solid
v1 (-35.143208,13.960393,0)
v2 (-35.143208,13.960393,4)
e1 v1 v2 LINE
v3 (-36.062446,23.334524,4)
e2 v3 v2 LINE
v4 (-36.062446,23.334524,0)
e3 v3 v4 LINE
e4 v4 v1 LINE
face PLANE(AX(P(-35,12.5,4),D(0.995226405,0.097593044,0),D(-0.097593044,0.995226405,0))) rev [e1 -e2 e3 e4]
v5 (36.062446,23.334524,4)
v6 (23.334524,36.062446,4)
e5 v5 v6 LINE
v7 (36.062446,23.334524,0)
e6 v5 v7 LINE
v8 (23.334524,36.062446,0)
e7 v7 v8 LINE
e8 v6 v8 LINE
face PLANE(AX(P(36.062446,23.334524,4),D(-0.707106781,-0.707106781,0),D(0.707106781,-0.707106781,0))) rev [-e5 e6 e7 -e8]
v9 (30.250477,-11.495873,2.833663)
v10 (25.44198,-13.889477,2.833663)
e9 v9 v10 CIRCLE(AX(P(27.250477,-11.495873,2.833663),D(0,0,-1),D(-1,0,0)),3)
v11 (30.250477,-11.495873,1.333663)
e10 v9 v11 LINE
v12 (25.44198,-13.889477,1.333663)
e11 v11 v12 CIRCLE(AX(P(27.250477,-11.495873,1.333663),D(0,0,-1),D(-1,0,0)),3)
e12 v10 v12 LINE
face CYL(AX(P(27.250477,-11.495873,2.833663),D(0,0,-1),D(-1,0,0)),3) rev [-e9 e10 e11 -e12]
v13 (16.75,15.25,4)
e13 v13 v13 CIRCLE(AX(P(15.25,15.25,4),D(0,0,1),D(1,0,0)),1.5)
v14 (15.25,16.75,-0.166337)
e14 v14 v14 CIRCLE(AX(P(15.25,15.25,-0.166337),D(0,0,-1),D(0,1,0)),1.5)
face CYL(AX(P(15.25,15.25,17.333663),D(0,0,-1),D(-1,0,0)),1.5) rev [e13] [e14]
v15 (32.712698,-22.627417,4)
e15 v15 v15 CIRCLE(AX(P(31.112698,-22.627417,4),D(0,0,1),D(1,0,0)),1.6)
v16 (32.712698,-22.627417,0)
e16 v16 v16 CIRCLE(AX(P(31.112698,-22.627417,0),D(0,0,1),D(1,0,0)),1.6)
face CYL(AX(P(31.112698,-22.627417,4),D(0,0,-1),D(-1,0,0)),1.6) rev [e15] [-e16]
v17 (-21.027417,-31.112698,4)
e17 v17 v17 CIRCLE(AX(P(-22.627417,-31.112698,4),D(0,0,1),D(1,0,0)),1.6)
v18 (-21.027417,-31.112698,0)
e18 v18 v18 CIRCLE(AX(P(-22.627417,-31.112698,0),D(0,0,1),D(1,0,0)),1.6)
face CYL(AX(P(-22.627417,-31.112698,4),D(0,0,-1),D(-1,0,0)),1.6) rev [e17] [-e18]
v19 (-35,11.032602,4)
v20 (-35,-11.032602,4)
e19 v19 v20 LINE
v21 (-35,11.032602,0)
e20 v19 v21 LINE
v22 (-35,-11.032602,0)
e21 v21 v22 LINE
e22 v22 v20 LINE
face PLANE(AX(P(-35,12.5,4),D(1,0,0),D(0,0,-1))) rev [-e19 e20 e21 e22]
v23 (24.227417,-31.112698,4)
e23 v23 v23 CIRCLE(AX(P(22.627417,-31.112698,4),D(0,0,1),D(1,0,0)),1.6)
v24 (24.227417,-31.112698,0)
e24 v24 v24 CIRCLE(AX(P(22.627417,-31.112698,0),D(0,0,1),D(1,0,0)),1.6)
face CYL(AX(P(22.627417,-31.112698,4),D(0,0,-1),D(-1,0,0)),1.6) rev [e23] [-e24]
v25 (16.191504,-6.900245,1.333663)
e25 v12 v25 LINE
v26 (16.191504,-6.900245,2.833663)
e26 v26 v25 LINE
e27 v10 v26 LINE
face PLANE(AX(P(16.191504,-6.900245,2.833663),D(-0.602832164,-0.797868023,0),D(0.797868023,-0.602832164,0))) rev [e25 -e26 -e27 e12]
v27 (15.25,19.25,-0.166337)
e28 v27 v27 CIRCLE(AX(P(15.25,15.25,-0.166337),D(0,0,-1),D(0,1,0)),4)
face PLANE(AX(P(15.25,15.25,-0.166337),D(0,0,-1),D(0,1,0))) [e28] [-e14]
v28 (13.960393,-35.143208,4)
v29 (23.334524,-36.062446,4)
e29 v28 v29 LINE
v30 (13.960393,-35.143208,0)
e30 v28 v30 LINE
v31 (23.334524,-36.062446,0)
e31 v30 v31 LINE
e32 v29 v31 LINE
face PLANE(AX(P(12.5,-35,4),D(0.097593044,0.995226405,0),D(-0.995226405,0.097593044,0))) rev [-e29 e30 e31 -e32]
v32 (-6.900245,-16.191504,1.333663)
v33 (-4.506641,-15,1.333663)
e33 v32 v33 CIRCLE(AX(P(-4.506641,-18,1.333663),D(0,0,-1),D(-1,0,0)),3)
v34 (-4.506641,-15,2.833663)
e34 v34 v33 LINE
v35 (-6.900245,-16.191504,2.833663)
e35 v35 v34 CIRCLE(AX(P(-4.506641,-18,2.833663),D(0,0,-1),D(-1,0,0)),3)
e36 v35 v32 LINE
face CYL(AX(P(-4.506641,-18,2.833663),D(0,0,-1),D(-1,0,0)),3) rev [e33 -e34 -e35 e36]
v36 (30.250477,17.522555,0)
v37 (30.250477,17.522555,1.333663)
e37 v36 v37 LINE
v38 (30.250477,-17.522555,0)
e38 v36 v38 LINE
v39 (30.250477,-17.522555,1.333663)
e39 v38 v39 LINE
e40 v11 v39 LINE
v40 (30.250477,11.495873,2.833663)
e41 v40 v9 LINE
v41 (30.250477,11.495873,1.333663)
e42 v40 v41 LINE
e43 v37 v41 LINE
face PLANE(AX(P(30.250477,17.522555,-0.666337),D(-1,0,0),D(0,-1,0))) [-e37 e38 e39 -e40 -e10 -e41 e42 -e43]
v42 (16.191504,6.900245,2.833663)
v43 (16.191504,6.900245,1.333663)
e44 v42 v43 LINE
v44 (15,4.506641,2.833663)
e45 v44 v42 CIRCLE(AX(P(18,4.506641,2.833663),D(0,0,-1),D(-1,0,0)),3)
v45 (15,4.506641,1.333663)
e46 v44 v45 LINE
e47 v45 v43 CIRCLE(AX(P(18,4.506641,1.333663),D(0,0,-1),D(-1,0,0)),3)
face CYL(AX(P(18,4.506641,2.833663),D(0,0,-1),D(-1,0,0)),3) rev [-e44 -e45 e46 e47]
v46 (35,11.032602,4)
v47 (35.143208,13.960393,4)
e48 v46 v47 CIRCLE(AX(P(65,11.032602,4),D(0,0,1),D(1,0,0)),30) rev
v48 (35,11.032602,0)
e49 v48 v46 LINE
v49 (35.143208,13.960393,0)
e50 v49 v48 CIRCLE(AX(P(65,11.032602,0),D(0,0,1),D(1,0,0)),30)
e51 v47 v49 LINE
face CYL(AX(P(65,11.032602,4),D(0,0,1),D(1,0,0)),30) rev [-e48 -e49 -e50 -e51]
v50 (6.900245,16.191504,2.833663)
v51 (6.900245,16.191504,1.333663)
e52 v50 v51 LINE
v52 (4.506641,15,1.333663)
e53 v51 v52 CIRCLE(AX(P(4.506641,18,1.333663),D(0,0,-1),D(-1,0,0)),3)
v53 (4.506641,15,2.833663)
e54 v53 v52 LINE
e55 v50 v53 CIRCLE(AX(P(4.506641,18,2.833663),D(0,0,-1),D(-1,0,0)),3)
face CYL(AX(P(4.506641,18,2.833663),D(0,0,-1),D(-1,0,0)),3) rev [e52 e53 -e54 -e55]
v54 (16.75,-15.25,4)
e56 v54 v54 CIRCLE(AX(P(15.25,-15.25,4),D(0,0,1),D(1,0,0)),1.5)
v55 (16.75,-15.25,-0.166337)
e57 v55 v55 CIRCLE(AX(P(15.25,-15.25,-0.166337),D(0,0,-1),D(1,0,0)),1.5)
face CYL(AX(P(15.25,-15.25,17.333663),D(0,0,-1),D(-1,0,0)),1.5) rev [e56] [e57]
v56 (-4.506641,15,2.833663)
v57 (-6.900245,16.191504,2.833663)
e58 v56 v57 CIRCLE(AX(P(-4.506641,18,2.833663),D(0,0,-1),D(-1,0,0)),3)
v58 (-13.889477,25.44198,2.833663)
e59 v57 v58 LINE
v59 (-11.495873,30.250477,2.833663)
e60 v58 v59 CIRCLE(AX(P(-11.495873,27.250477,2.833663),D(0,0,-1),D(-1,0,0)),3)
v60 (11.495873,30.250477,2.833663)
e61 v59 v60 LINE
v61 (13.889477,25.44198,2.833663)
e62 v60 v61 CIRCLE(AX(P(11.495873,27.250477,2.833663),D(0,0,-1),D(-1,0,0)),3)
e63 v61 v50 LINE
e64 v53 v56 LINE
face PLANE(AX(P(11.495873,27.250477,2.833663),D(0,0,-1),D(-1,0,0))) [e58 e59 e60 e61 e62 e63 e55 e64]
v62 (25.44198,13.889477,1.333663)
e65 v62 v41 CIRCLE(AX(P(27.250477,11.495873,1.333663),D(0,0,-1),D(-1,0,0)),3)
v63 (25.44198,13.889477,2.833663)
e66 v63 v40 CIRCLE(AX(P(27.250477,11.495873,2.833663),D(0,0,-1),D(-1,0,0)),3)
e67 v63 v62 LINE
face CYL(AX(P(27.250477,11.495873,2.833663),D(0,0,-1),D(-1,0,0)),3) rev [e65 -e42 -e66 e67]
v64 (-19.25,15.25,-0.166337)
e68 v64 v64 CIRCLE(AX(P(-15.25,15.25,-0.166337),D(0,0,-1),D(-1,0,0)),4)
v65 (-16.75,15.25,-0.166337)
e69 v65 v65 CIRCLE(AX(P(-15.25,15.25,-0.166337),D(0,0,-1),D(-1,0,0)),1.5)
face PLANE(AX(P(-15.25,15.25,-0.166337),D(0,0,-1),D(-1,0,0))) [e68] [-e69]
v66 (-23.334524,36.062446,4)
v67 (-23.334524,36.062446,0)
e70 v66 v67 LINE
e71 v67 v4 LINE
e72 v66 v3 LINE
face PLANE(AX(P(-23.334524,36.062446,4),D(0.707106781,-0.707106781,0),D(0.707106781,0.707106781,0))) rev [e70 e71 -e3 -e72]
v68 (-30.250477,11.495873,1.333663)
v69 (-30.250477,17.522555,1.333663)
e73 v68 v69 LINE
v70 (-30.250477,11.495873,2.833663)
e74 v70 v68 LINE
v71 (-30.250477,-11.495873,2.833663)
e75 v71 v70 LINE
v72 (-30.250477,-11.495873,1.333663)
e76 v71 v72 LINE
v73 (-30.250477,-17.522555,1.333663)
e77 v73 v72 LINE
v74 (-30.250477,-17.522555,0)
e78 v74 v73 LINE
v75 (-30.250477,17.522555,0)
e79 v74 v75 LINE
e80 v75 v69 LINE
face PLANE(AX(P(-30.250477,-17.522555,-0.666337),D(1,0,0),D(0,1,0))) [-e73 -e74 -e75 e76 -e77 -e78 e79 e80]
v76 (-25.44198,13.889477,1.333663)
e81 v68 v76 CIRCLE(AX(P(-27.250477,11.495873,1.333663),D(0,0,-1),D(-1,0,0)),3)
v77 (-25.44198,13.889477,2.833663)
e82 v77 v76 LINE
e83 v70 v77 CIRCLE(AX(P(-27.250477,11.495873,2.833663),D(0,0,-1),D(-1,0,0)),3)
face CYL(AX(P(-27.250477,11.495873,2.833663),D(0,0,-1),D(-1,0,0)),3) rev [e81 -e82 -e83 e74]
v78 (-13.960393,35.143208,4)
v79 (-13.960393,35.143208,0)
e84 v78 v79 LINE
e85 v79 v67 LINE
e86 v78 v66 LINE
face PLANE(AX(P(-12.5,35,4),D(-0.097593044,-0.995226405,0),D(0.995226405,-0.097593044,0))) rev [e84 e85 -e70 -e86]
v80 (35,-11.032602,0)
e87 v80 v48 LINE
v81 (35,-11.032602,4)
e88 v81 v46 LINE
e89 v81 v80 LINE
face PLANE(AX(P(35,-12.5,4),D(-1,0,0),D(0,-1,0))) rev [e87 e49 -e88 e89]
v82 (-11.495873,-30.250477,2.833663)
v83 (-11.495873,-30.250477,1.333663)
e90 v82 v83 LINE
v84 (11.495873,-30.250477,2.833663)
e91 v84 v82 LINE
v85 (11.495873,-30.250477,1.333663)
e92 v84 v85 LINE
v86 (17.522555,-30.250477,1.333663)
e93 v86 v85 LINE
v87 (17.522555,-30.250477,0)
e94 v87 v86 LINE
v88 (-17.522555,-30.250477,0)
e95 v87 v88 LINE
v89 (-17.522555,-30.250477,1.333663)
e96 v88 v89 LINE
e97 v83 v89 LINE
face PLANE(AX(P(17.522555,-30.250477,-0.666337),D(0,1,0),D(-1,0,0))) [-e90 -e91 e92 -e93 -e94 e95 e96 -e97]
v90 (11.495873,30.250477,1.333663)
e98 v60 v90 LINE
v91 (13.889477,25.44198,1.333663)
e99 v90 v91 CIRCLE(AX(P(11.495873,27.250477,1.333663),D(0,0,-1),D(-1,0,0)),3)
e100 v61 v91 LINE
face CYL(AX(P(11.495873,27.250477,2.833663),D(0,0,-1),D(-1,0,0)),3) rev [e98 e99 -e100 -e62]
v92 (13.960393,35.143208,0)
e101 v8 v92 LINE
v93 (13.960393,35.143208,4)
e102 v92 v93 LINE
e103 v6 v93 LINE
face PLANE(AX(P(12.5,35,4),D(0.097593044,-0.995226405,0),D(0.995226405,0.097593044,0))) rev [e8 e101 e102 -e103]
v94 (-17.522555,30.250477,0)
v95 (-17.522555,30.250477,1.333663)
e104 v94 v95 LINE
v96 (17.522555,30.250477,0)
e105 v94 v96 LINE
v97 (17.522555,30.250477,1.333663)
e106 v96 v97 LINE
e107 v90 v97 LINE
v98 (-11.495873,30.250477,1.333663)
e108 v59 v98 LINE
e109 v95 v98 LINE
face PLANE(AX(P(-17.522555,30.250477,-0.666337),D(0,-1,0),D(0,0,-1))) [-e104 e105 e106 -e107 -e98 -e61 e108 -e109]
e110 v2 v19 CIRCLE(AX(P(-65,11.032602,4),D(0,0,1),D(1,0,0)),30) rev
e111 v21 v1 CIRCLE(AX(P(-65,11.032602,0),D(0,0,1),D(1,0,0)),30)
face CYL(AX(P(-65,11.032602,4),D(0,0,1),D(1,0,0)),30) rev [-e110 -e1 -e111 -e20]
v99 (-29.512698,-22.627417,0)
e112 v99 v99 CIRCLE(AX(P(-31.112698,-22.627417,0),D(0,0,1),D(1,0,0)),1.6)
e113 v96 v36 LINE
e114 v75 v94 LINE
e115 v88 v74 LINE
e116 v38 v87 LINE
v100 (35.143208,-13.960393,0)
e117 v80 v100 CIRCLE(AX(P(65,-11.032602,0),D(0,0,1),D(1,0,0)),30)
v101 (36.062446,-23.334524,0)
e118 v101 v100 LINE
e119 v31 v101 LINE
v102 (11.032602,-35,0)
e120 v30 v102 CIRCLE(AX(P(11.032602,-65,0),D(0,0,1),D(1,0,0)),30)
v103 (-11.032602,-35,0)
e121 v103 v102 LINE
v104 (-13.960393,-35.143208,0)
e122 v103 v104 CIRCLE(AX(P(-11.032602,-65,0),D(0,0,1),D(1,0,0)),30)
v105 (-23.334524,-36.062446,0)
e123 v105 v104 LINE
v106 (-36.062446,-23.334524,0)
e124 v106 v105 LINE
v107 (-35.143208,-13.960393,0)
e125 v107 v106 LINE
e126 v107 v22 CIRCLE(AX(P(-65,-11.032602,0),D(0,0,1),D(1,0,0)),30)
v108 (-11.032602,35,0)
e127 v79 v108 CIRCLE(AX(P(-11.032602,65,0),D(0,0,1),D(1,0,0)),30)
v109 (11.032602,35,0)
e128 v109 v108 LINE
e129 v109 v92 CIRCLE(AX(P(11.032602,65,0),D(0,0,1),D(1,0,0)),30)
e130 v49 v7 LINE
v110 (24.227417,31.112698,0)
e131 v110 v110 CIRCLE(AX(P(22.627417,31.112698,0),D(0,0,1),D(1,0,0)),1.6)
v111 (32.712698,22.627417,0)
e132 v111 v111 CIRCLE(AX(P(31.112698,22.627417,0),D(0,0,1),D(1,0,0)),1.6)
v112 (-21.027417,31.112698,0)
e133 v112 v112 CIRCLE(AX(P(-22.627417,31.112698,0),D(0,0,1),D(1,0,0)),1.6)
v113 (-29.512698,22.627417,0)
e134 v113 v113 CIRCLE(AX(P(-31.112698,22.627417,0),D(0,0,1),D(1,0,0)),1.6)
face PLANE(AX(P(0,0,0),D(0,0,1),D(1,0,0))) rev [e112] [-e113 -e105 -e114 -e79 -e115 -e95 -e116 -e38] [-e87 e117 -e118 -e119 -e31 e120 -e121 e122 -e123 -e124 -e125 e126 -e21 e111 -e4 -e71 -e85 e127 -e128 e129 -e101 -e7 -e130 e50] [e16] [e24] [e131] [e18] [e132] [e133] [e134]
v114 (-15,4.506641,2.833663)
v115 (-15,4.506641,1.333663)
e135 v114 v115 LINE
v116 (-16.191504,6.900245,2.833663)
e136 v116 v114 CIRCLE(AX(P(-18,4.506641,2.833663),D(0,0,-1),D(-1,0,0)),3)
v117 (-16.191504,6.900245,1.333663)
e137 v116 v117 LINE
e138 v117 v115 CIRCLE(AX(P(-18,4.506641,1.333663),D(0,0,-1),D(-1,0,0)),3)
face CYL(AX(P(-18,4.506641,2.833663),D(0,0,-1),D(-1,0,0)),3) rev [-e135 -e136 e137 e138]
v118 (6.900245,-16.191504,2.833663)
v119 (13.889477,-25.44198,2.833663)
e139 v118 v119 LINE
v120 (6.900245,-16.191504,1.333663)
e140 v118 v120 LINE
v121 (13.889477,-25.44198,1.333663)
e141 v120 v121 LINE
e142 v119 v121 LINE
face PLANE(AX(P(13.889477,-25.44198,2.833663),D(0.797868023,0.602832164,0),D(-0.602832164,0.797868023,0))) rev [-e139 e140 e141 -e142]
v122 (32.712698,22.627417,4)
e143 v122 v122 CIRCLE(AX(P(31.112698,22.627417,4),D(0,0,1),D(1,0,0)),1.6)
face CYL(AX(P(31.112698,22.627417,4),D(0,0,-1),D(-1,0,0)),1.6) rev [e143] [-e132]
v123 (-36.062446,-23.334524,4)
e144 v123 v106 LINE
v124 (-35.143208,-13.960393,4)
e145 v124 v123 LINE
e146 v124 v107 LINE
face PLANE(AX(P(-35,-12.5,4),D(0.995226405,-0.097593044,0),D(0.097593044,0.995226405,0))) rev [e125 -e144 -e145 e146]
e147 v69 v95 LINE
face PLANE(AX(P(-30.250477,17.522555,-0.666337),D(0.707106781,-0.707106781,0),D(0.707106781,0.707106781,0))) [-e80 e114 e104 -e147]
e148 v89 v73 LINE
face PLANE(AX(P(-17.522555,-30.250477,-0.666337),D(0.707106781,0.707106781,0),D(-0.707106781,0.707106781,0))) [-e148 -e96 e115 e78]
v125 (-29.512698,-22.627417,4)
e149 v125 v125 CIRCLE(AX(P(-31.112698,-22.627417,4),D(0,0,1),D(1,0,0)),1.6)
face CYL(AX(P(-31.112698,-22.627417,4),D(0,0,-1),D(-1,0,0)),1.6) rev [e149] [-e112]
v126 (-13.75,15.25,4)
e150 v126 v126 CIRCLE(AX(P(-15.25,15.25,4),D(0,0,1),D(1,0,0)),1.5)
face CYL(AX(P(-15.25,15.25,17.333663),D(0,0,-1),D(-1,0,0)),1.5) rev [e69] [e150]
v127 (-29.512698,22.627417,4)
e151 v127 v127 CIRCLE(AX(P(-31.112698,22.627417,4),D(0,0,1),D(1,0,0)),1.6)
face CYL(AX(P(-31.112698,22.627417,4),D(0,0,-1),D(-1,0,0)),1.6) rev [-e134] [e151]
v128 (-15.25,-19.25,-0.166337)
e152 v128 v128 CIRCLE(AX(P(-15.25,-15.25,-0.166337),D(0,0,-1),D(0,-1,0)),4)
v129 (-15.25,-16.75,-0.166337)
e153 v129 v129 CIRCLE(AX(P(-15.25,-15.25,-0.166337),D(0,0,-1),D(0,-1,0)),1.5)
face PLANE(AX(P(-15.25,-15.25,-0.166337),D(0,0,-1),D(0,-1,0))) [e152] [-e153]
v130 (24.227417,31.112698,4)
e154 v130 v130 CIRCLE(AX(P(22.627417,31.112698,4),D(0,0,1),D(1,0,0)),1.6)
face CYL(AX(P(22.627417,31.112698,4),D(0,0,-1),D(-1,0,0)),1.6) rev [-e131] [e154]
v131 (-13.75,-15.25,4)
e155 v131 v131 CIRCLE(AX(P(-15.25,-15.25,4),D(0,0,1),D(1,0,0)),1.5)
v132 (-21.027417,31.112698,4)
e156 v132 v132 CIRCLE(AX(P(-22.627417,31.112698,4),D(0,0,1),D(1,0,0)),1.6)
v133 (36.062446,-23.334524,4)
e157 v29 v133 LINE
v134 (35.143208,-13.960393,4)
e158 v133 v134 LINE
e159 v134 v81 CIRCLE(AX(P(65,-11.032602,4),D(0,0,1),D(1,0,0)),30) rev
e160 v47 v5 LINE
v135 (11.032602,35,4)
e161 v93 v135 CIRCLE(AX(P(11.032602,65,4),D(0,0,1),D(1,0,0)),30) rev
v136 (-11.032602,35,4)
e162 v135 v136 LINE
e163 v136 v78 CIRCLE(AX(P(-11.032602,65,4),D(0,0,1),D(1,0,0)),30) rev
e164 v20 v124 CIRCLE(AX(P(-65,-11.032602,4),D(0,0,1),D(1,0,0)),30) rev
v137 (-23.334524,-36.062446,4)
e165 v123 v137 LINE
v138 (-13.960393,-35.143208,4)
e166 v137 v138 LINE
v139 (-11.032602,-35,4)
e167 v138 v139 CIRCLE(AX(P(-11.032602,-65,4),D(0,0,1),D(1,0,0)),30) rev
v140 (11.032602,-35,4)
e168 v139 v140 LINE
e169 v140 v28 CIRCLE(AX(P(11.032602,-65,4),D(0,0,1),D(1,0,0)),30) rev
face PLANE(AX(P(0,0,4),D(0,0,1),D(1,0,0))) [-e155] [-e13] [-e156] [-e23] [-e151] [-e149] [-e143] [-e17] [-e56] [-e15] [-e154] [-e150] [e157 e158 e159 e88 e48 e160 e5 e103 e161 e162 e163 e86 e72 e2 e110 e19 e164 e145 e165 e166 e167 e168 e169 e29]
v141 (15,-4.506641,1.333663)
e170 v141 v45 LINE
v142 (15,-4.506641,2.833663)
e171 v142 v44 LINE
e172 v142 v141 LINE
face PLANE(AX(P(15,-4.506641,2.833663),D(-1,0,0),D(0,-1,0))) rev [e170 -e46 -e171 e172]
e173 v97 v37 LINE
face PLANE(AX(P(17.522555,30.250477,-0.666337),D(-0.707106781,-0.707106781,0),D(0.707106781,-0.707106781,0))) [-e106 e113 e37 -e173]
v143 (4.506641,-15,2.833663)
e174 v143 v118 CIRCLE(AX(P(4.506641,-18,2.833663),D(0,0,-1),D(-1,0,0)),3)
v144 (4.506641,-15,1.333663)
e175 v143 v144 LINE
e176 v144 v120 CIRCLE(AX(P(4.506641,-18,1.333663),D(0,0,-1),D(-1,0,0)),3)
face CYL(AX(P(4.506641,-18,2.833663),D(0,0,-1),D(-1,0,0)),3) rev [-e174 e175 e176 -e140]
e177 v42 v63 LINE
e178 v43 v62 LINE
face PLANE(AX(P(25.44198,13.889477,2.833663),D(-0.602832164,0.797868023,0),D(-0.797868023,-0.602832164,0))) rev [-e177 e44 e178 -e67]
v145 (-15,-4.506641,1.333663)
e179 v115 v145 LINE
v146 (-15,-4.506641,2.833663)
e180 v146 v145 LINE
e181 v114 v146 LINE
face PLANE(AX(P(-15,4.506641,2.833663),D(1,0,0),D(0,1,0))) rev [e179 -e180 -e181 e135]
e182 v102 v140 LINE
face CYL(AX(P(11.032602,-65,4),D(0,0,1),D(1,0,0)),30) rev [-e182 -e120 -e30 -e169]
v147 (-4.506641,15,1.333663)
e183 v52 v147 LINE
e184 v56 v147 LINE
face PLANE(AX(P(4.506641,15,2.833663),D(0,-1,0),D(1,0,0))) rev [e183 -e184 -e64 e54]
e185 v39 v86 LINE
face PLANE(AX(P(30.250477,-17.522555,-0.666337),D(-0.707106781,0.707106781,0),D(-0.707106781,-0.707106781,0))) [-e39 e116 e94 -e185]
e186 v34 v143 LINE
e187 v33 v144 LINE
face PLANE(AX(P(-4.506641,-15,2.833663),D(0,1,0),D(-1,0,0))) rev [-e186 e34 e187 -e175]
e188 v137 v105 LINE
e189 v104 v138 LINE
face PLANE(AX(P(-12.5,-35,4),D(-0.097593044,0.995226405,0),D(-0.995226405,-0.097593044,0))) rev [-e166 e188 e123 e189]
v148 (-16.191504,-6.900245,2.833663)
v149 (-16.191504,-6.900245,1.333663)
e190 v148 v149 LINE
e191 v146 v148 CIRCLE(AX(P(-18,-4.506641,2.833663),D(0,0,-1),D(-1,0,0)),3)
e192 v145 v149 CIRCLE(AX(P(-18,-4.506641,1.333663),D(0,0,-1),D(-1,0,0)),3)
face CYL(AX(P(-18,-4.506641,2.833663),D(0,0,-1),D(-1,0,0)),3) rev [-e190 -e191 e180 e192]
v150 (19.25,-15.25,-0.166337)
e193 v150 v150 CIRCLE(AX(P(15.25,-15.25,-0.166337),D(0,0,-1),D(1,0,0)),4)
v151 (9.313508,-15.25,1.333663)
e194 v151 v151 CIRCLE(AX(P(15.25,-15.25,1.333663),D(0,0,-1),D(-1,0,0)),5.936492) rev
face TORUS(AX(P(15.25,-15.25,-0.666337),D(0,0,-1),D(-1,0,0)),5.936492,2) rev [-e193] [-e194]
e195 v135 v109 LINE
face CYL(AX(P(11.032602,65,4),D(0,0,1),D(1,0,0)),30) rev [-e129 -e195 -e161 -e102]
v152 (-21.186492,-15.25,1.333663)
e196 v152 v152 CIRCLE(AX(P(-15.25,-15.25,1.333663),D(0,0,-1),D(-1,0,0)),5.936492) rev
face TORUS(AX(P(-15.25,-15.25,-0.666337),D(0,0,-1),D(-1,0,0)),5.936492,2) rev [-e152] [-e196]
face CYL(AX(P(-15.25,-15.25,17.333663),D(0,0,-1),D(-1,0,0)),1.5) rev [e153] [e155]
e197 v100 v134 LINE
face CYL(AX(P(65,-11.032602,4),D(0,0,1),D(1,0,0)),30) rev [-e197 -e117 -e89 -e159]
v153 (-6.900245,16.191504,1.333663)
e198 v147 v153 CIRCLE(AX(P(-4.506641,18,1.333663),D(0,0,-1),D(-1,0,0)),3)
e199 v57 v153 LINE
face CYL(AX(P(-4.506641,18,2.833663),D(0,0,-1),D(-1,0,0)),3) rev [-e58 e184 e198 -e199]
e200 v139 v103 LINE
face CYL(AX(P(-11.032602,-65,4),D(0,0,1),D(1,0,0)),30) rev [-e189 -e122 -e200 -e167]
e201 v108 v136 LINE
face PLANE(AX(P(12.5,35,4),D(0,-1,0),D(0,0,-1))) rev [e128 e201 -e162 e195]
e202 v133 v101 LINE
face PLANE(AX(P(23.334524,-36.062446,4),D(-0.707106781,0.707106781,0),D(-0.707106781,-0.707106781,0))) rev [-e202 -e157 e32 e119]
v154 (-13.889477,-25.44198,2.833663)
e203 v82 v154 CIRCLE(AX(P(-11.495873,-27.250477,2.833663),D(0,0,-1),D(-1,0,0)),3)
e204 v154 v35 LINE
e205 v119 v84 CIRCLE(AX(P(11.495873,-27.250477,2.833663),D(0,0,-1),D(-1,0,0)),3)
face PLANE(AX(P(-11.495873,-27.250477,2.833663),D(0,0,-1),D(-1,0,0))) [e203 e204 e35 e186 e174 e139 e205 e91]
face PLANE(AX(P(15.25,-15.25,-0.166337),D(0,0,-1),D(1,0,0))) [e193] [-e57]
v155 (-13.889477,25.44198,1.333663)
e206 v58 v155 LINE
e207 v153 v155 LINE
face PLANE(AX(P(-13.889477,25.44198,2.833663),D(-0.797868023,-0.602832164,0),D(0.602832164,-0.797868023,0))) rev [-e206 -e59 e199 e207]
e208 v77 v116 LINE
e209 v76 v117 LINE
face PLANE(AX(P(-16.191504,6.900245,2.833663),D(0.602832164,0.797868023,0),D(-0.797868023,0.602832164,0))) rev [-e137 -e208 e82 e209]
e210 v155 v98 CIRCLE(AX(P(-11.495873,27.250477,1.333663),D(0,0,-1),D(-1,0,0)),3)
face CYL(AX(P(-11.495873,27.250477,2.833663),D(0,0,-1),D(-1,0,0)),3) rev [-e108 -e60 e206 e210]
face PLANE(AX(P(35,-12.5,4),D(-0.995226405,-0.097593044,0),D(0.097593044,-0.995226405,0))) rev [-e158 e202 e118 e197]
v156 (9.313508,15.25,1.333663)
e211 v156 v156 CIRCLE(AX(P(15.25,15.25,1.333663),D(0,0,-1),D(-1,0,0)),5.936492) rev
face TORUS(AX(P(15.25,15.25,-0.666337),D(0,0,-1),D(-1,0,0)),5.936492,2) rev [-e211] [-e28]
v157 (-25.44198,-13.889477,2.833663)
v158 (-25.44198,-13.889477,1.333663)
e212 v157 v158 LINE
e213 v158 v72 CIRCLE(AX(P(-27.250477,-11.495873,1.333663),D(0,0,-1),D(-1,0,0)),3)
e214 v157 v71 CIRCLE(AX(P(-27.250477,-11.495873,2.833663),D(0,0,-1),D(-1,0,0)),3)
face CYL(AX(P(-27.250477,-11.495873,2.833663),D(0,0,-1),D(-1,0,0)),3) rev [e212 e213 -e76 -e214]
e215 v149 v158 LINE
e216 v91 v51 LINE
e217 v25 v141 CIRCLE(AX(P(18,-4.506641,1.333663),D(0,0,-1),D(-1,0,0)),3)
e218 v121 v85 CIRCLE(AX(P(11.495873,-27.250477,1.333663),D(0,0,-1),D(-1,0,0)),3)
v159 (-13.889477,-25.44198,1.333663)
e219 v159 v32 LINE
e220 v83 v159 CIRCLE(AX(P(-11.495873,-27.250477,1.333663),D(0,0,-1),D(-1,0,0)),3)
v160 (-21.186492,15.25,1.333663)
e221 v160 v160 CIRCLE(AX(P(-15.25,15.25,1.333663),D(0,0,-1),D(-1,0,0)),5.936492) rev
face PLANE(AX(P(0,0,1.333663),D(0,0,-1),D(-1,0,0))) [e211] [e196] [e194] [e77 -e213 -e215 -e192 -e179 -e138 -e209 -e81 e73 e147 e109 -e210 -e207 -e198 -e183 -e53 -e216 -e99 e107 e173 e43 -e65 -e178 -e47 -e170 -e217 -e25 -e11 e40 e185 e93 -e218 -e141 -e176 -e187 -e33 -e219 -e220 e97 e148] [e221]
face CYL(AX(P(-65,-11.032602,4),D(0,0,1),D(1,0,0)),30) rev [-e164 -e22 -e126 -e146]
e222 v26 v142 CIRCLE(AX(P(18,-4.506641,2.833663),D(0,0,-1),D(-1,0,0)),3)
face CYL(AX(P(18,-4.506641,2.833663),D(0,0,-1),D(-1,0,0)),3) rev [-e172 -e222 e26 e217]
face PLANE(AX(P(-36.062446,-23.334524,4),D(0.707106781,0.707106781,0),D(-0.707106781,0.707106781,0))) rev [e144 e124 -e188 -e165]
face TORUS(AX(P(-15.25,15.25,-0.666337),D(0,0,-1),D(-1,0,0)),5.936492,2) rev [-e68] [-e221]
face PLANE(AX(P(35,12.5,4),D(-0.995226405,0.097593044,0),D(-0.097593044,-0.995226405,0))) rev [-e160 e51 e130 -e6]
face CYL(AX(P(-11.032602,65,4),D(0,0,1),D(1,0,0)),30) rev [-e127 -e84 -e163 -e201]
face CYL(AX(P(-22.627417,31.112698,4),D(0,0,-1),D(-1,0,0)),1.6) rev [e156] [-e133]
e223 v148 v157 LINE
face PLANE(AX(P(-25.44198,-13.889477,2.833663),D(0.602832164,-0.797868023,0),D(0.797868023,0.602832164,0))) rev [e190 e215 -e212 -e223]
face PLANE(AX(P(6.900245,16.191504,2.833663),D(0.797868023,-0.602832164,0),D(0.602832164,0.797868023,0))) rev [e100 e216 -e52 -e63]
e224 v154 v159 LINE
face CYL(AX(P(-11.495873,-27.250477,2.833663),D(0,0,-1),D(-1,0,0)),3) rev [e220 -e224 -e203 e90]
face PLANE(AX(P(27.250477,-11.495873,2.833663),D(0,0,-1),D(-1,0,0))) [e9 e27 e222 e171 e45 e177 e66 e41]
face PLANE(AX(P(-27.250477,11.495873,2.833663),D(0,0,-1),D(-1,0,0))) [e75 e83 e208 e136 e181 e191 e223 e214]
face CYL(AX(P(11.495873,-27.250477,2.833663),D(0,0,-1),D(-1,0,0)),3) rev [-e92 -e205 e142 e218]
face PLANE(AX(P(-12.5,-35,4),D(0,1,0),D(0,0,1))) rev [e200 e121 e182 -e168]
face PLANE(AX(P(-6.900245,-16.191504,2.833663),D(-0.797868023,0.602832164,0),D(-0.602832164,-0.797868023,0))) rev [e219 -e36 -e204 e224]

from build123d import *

# Parameters (mm, degrees)
SKETCH1_R           = 1.6
BOSS_EXTRUDE1_DEPTH = 4
CUT_EXTRUDE7_DEPTH  = 1
CUT_EXTRUDE8_DEPTH  = 1.5
SKETCH8_R           = 4
BOSS_EXTRUDE5_DEPTH = 1.5
SKETCH13_R          = 1.5
CUT_EXTRUDE12_DEPTH = 17.5
CIRPATTERN2_COUNT   = 4
FILLET2_R           = 2
FILLET3_R           = 30


with BuildPart() as part:
    # Sketch1 → Boss-Extrude1 (new body)
    with BuildSketch(Plane.XY):
        Polygon((12.5, 35), (-12.5, 35), (-23.334523779, 36.062445841), (-36.062445841, 23.334523779), (-35, 12.5), (-35, -12.5), (-36.062445841, -23.334523779), (-23.334523779, -36.062445841), (-12.5, -35), (12.5, -35), (23.334523779, -36.062445841), (36.062445841, -23.334523779), (35, -12.5), (35, 12.5), (36.062445841, 23.334523779), (23.334523779, 36.062445841), align=None)
        with Locations((31.112698372, 22.627416998)):
            Circle(SKETCH1_R, mode=Mode.SUBTRACT)
        with Locations((22.627416998, 31.112698372)):
            Circle(SKETCH1_R, mode=Mode.SUBTRACT)
        with Locations((22.627416998, -31.112698372)):
            Circle(SKETCH1_R, mode=Mode.SUBTRACT)
        with Locations((31.112698372, -22.627416998)):
            Circle(SKETCH1_R, mode=Mode.SUBTRACT)
        with Locations((-31.112698372, -22.627416998)):
            Circle(SKETCH1_R, mode=Mode.SUBTRACT)
        with Locations((-22.627416998, -31.112698372)):
            Circle(SKETCH1_R, mode=Mode.SUBTRACT)
        with Locations((-22.627416998, 31.112698372)):
            Circle(SKETCH1_R, mode=Mode.SUBTRACT)
        with Locations((-31.112698372, 22.627416998)):
            Circle(SKETCH1_R, mode=Mode.SUBTRACT)
    extrude(amount=BOSS_EXTRUDE1_DEPTH)

    # 3DSketch1 → Cut-Extrude7 (cut, symmetric)
    with BuildSketch(Plane(origin=(-17.522554566, 30.250476628, 0.3336629), x_dir=(0.5012316605773316, -0.8653131354803826, 0), z_dir=(0, 0, -1))):
        Polygon((0, 0), (17.565718245, -30.324993267), (34.958993903, -34.958993903), (65.28398717, -17.393275658), (69.917987806, 0), (52.352269561, 30.324993267), (34.958993903, 34.958993903), (4.634000637, 17.393275658), align=None)
    extrude(amount=CUT_EXTRUDE7_DEPTH, both=True, mode=Mode.SUBTRACT)

    # Sketch7 → Cut-Extrude8 (cut)
    with BuildSketch(Plane(origin=(0, 0, 1.3336629), x_dir=(-1, 0, 0), z_dir=(0, 0, -1))):
        with BuildLine():
            Line((-15, -4.506640856), (-15, 4.506640856))
            ThreePointArc((-15, 4.506640856), (-15.314344635, 5.843523522), (-16.191503508, 6.900244925))
            Line((-16.191503508, 6.900244925), (-25.441980135, 13.889477085))
            ThreePointArc((-25.441980135, 13.889477085), (-28.587359293, 14.181528381), (-30.250476628, 11.495873016))
            Line((-30.250476628, 11.495873016), (-30.250476628, -11.495873016))
            ThreePointArc((-30.250476628, -11.495873016), (-28.587359293, -14.181528381), (-25.441980135, -13.889477085))
            Line((-25.441980135, -13.889477085), (-16.191503508, -6.900244925))
            ThreePointArc((-16.191503508, -6.900244925), (-15.314344635, -5.843523522), (-15, -4.506640856))
        make_face()
        with BuildLine():
            Line((13.889477085, 25.441980135), (6.900244925, 16.191503508))
            ThreePointArc((6.900244925, 16.191503508), (5.843523522, 15.314344635), (4.506640856, 15))
            Line((4.506640856, 15), (-4.506640856, 15))
            ThreePointArc((-4.506640856, 15), (-5.843523522, 15.314344635), (-6.900244925, 16.191503508))
            Line((-6.900244925, 16.191503508), (-13.889477085, 25.441980135))
            ThreePointArc((-13.889477085, 25.441980135), (-14.181528381, 28.587359293), (-11.495873016, 30.250476628))
            Line((-11.495873016, 30.250476628), (11.495873016, 30.250476628))
            ThreePointArc((11.495873016, 30.250476628), (14.181528381, 28.587359293), (13.889477085, 25.441980135))
        make_face()
        with BuildLine():
            Line((25.441980135, -13.889477085), (16.191503508, -6.900244925))
            ThreePointArc((16.191503508, -6.900244925), (15.314344635, -5.843523522), (15, -4.506640856))
            Line((15, -4.506640856), (15, 4.506640856))
            ThreePointArc((15, 4.506640856), (15.314344635, 5.843523522), (16.191503508, 6.900244925))
            Line((16.191503508, 6.900244925), (25.441980135, 13.889477085))
            ThreePointArc((25.441980135, 13.889477085), (28.587359293, 14.181528381), (30.250476628, 11.495873016))
            Line((30.250476628, 11.495873016), (30.250476628, -11.495873016))
            ThreePointArc((30.250476628, -11.495873016), (28.587359293, -14.181528381), (25.441980135, -13.889477085))
        make_face()
        with BuildLine():
            Line((-13.889477085, -25.441980135), (-6.900244925, -16.191503508))
            ThreePointArc((-6.900244925, -16.191503508), (-5.843523522, -15.314344635), (-4.506640856, -15))
            Line((-4.506640856, -15), (4.506640856, -15))
            ThreePointArc((4.506640856, -15), (5.843523522, -15.314344635), (6.900244925, -16.191503508))
            Line((6.900244925, -16.191503508), (13.889477085, -25.441980135))
            ThreePointArc((13.889477085, -25.441980135), (14.181528381, -28.587359293), (11.495873016, -30.250476628))
            Line((11.495873016, -30.250476628), (-11.495873016, -30.250476628))
            ThreePointArc((-11.495873016, -30.250476628), (-14.181528381, -28.587359293), (-13.889477085, -25.441980135))
        make_face()
    extrude(amount=-CUT_EXTRUDE8_DEPTH, mode=Mode.SUBTRACT)

    # Sketch8 → Boss-Extrude5 (add)
    with BuildSketch(Plane(origin=(0, 0, 1.3336629), x_dir=(-1, 0, 0), z_dir=(0, 0, -1))):
        with Locations((15.25, 15.25)):
            Circle(SKETCH8_R)
    boss_extrude5 = extrude(amount=BOSS_EXTRUDE5_DEPTH)

    # Sketch13 → Cut-Extrude12 (cut)
    with BuildSketch(Plane(origin=(0, 0, -0.1663371), x_dir=(-1, 0, 0), z_dir=(0, 0, -1))):
        with Locations((15.25, 15.25)):
            Circle(SKETCH13_R)
    cut_extrude12 = extrude(amount=-CUT_EXTRUDE12_DEPTH, mode=Mode.SUBTRACT)

    # CirPattern2: Boss-Extrude5, Cut-Extrude12 ×4 about axis
    cirpattern2_axis = Axis((0, 0, 0), (0, 0, 1))
    add([boss_extrude5.rotate(cirpattern2_axis, i * 360 / CIRPATTERN2_COUNT) for i in range(1, CIRPATTERN2_COUNT)])
    add([cut_extrude12.rotate(cirpattern2_axis, i * 360 / CIRPATTERN2_COUNT) for i in range(1, CIRPATTERN2_COUNT)], mode=Mode.SUBTRACT)

    # Fillet2
    # the kernel refuses this fillet: 2 mm, written as the material it adds along each edge
    with BuildSketch(Plane(origin=(-15.25, 15.25, 1.3336629), x_dir=(-1, 0, 0), z_dir=(0, -1, 0))) as fillet2_piece_1:
        with BuildLine():
            CenterArc((5.936491673, 2), FILLET2_R, 194.477512186, 75.522487814)
            Line((4, 1.5), (3.961270167, 1.49))
            ThreePointArc((3.961270167, 1.49), (3.96, 0.75), (3.96, 0))
            Line((3.96, 0), (4, -0.04))
            Line((4, -0.04), (5.936491673, -0.04))
            Line((5.936491673, -0.04), (5.936491673, 0))
        make_face()
    revolve(axis=Axis((-15.25, 15.25, 1.3336629), (0, 0, -1)))
    with BuildSketch(Plane(origin=(-15.25, -15.25, 1.3336629), x_dir=(0, -1, 0), z_dir=(1, 0, 0))) as fillet2_piece_2:
        with BuildLine():
            CenterArc((5.936491673, 2), FILLET2_R, 194.477512186, 75.522487814)
            Line((4, 1.5), (3.961270167, 1.49))
            ThreePointArc((3.961270167, 1.49), (3.96, 0.75), (3.96, 0))
            Line((3.96, 0), (4, -0.04))
            Line((4, -0.04), (5.936491673, -0.04))
            Line((5.936491673, -0.04), (5.936491673, 0))
        make_face()
    revolve(axis=Axis((-15.25, -15.25, 1.3336629), (0, 0, -1)))
    with BuildSketch(Plane(origin=(15.25, -15.25, 1.3336629), x_dir=(1, 0, 0), z_dir=(0, 1, 0))) as fillet2_piece_3:
        with BuildLine():
            CenterArc((5.936491673, 2), FILLET2_R, 194.477512186, 75.522487814)
            Line((4, 1.5), (3.961270167, 1.49))
            ThreePointArc((3.961270167, 1.49), (3.96, 0.75), (3.96, 0))
            Line((3.96, 0), (4, -0.04))
            Line((4, -0.04), (5.936491673, -0.04))
            Line((5.936491673, -0.04), (5.936491673, 0))
        make_face()
    revolve(axis=Axis((15.25, -15.25, 1.3336629), (0, 0, -1)))
    with BuildSketch(Plane(origin=(15.25, 15.25, 1.3336629), x_dir=(0, 1, 0), z_dir=(-1, 0, 0))) as fillet2_piece_4:
        with BuildLine():
            CenterArc((5.936491673, 2), FILLET2_R, 194.477512186, 75.522487814)
            Line((4, 1.5), (3.961270167, 1.49))
            ThreePointArc((3.961270167, 1.49), (3.96, 0.75), (3.96, 0))
            Line((3.96, 0), (4, -0.04))
            Line((4, -0.04), (5.936491673, -0.04))
            Line((5.936491673, -0.04), (5.936491673, 0))
        make_face()
    revolve(axis=Axis((15.25, 15.25, 1.3336629), (0, 0, -1)))

    # Fillet3
    # the kernel refuses this fillet: 30 mm, written as the material it adds along each edge
    with BuildSketch(Plane(origin=(-12.5, 35, 0), x_dir=(1, 0, 0), z_dir=(0, 0, 1)), Plane(origin=(-12.5, -35, 0), x_dir=(-0.995226405289247, -0.09759304388655768, 0), z_dir=(0, 0, 1)), Plane(origin=(-35, -12.5, 0), x_dir=(0, 1, 0), z_dir=(0, 0, 1)), Plane(origin=(-35, 12.5, 0), x_dir=(-0.09759304388655696, 0.9952264052892469, 0), z_dir=(0, 0, 1))) as fillet3_piece_1:
        with BuildLine():
            CenterArc((FILLET3_R * 0.0489132680019, FILLET3_R), FILLET3_R, 264.399415997, 5.600584003)
            Line((-FILLET3_R * 0.0486797758845, FILLET3_R * 0.00477359471074), (0, 0))
            Line((0, 0), (FILLET3_R * 0.0489132680019, 0))
        make_face()
    extrude(amount=4)
    with BuildSketch(Plane(origin=(12.5, 35, 0), x_dir=(-1, 0, 0), z_dir=(0, 0, 1)), Plane(origin=(35, 12.5, 0), x_dir=(0.09759304388646403, 0.9952264052892561, 0), z_dir=(0, 0, 1)), Plane(origin=(35, -12.5, 0), x_dir=(0, 1, 0), z_dir=(0, 0, 1)), Plane(origin=(12.5, -35, 0), x_dir=(0.9952264052892558, -0.09759304388646729, 0), z_dir=(0, 0, 1))) as fillet3_piece_2:
        with BuildLine():
            CenterArc((FILLET3_R * 0.048913268002, -FILLET3_R), FILLET3_R, 90, 5.600584003)
            Line((-FILLET3_R * 0.0486797758846, -FILLET3_R * 0.00477359471075), (0, 0))
            Line((0, 0), (FILLET3_R * 0.048913268002, 0))
        make_face()
    extrude(amount=4)


solid = part.part
